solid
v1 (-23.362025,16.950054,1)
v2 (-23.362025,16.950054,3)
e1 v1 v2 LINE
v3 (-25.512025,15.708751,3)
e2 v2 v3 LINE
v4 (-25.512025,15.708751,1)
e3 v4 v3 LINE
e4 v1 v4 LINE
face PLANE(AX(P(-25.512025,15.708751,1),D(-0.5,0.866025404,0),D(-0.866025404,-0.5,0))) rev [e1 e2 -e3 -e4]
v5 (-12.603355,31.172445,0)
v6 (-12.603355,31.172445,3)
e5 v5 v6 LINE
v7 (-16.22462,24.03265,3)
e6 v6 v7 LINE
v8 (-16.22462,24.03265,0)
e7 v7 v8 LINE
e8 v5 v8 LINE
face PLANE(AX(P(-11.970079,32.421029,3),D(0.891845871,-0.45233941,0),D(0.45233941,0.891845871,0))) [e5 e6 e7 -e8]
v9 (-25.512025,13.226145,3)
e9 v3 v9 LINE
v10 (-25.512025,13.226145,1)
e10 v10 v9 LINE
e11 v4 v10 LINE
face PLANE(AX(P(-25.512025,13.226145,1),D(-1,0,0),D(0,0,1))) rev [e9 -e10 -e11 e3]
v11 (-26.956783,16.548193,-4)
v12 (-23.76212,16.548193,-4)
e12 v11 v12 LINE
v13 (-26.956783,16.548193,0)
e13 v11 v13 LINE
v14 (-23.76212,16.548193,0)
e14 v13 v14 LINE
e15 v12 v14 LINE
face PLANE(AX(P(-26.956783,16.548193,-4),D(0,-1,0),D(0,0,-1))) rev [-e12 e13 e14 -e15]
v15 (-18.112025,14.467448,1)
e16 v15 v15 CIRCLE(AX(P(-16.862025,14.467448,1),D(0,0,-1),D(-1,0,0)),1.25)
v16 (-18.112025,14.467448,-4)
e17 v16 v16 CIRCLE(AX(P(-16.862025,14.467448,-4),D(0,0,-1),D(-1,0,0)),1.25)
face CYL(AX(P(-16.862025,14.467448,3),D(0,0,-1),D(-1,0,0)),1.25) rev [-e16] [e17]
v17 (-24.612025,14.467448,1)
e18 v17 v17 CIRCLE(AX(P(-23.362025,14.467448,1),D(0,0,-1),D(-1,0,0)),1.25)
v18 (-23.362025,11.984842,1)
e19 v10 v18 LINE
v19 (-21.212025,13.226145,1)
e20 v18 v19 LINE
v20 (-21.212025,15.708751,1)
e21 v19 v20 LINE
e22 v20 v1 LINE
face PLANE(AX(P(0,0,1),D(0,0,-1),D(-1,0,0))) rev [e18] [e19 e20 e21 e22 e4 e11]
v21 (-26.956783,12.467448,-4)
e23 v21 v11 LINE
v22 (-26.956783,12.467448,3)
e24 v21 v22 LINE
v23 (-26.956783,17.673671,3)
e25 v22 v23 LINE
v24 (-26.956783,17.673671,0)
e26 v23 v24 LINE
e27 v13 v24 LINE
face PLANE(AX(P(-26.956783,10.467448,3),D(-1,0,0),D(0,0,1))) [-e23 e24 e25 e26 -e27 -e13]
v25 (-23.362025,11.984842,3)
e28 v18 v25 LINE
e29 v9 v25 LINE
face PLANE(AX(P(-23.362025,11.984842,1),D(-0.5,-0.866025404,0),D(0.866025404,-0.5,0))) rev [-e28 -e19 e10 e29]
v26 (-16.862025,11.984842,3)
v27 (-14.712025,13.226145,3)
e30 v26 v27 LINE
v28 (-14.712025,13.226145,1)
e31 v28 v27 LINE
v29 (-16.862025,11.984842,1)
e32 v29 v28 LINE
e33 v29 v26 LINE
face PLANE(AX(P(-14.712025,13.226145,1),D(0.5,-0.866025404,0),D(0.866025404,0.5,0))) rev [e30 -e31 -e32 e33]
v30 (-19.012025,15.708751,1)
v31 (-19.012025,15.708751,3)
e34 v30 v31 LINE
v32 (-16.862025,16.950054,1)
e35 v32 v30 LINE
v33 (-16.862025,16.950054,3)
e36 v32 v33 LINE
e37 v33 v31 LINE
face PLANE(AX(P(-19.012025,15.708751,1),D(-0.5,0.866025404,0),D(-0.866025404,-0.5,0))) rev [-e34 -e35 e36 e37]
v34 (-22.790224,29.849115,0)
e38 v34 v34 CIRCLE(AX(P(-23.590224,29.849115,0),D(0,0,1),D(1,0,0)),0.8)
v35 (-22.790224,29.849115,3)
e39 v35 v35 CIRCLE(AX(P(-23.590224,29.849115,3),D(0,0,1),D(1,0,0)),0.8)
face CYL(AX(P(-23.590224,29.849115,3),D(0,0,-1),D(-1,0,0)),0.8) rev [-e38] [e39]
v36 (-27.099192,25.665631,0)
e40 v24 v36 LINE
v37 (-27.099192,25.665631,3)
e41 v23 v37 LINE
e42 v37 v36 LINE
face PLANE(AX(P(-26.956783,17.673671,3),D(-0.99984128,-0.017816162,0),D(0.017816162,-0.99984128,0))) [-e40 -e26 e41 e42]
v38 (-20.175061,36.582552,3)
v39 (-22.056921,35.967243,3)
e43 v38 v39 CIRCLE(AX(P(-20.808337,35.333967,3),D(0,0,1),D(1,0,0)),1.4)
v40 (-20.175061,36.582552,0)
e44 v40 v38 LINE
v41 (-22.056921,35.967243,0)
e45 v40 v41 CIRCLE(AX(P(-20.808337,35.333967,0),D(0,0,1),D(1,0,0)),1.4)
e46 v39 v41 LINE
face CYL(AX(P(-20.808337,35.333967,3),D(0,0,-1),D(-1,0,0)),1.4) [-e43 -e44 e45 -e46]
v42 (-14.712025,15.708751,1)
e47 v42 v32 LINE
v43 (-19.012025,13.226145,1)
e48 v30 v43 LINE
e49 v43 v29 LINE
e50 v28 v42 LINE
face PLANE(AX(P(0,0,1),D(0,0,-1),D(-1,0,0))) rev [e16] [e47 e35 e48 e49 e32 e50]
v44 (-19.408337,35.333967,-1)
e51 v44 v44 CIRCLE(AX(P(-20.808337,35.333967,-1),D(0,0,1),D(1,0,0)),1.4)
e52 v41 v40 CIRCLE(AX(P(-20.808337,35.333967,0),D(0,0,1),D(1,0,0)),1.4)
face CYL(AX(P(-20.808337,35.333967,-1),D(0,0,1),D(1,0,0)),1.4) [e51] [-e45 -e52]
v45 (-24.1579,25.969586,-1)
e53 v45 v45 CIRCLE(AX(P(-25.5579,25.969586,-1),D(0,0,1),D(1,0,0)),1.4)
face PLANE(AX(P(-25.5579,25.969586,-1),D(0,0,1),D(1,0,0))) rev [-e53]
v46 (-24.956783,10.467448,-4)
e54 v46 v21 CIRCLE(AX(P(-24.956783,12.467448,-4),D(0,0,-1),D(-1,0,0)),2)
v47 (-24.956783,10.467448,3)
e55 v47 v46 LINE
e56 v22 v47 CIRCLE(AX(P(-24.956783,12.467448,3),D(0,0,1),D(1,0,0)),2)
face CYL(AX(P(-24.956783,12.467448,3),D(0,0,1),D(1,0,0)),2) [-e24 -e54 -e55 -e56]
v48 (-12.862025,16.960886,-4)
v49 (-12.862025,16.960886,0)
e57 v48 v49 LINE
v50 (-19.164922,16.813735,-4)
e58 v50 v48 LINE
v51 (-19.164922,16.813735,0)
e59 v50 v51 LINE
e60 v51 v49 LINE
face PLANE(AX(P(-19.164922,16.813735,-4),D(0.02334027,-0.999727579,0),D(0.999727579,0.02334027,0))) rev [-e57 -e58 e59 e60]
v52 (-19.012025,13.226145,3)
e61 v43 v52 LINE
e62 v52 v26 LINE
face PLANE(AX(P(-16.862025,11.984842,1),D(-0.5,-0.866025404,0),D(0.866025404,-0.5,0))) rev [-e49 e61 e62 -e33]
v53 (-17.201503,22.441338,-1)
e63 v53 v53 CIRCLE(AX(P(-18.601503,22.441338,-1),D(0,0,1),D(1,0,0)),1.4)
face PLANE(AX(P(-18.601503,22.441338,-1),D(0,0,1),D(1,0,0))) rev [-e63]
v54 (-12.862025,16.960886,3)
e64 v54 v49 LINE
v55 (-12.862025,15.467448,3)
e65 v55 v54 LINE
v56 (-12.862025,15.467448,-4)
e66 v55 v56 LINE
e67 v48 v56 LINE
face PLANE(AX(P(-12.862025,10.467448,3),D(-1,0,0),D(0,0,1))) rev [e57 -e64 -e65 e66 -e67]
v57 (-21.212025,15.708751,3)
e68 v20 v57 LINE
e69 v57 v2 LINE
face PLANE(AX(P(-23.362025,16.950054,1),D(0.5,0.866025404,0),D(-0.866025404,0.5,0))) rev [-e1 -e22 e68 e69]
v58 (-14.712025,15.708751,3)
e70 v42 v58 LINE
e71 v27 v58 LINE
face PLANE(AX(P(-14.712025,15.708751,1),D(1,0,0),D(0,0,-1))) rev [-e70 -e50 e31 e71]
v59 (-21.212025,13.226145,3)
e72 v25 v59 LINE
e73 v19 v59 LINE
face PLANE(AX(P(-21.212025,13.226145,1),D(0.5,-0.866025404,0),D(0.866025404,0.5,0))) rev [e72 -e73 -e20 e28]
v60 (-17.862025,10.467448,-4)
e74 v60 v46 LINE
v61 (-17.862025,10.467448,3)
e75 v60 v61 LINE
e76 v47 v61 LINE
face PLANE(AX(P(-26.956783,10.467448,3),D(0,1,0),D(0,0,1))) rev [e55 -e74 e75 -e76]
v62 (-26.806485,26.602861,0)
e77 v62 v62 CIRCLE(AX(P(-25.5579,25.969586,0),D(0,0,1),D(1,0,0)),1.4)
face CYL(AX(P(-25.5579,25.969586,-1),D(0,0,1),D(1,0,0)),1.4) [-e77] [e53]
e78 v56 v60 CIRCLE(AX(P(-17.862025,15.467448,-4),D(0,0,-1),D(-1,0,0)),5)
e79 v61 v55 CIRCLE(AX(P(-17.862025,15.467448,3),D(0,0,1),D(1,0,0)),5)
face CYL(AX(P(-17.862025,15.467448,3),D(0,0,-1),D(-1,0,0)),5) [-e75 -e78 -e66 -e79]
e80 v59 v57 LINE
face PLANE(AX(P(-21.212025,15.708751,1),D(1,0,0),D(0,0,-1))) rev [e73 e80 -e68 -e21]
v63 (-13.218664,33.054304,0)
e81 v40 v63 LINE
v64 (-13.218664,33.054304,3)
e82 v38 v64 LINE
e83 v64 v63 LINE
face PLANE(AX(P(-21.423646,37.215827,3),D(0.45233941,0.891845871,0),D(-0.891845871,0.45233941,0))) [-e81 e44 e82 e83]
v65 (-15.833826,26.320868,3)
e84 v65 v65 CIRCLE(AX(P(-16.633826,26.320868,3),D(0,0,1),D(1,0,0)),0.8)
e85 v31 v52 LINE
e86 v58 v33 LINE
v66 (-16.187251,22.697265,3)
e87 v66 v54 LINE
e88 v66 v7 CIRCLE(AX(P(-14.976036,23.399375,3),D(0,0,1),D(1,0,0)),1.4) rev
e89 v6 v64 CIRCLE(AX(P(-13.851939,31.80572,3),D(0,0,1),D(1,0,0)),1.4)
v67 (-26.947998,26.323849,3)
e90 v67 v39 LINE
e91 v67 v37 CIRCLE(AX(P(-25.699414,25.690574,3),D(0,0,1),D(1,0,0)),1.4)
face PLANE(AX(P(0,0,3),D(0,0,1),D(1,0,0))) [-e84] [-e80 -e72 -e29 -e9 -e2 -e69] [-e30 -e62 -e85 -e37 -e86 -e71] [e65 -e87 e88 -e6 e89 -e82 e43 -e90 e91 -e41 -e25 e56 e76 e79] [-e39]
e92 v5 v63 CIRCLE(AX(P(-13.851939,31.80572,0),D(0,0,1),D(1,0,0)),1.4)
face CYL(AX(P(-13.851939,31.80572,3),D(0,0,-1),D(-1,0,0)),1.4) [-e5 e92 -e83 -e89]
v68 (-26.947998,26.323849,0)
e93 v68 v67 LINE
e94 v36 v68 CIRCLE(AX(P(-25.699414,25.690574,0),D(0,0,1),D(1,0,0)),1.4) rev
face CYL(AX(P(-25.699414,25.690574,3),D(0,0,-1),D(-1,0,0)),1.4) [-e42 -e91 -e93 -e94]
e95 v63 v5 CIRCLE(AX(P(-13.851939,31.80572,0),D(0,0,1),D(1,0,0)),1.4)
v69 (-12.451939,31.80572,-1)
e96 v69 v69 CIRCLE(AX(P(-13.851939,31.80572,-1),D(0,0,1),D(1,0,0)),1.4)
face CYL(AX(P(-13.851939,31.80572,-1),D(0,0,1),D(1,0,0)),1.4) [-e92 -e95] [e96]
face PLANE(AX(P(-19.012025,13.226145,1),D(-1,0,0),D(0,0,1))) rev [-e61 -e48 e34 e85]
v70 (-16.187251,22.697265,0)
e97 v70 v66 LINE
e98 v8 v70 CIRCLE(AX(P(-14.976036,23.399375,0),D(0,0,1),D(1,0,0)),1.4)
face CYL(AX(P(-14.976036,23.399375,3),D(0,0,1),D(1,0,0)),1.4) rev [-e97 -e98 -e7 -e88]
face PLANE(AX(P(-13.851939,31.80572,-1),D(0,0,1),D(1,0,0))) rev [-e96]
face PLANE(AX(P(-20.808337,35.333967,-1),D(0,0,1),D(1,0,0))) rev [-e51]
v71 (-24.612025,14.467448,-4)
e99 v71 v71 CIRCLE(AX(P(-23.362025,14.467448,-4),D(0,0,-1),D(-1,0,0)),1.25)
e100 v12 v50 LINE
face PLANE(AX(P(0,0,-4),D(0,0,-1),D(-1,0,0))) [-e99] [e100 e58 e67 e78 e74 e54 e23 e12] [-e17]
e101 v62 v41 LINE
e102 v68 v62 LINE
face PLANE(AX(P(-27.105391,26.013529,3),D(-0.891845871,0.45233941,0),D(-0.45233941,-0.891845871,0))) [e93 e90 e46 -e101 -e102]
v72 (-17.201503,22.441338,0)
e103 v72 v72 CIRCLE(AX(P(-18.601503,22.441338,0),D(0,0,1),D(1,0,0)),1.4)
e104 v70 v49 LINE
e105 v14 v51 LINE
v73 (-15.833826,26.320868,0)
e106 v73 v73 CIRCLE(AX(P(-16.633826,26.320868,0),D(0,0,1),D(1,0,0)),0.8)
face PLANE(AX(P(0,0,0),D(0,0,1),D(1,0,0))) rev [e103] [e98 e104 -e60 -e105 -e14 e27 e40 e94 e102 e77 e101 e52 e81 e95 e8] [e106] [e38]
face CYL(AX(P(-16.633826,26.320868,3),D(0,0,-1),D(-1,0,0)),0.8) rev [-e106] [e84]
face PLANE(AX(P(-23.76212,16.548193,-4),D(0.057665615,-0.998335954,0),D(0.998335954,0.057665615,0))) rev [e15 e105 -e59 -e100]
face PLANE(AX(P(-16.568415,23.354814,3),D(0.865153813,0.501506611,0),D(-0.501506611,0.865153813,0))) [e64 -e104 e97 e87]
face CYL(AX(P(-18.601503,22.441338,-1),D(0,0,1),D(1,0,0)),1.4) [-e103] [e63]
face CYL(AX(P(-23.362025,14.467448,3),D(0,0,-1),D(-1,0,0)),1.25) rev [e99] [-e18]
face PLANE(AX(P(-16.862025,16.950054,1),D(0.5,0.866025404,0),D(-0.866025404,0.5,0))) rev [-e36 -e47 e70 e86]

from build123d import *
from build123d.topology import SkipClean

# Parameters (mm, degrees)
SKETCH_1_R          = 1.25
SKETCH_1_R_2        = 0.8
EXTRUDE_1_DEPTH     = 3
SKETCH_1_3_R        = 1.4
EXTRUDE_2_DEPTH     = 1
EXTRUDE_START       = 4
SKETCH_2_R          = 1.25
EXTRUDE_4_DEPTH     = 4
CUT_EXTRUDE_1_DEPTH = 2
FILLET_5_R          = 1.4
FILLET_6_R          = 5
FILLET_7_R          = 2


with BuildPart() as part:
    # 草图1 → 凸台-拉伸1 (new body)
    with BuildSketch(Plane.XY):
        Polygon((-26.956782862, 10.467447756), (-12.862024989, 10.467447756), (-12.862024989, 16.960886275), (-16.568414577, 23.35481412), (-11.970079327, 32.421029044), (-21.423645563, 37.215826788), (-27.105390709, 26.013528601), (-26.956782862, 17.673670772), align=None)
        with Locations((-16.862024989, 14.467447756)):
            Circle(SKETCH_1_R, mode=Mode.SUBTRACT)
        with Locations((-23.362024989, 14.467447756)):
            Circle(SKETCH_1_R, mode=Mode.SUBTRACT)
        with Locations((-16.633826091, 26.320867889)):
            Circle(SKETCH_1_R_2, mode=Mode.SUBTRACT)
        with Locations((-23.590223888, 29.849115285)):
            Circle(SKETCH_1_R_2, mode=Mode.SUBTRACT)
    extrude(amount=EXTRUDE_1_DEPTH)

    # 草图1<3> → 凸台-拉伸2 (add)
    with BuildSketch(Plane.XY):
        with Locations((-13.85193872, 31.805719998)):
            Circle(SKETCH_1_3_R)
        with Locations((-20.808336517, 35.333967395)):
            Circle(SKETCH_1_3_R)
        with Locations((-25.55790032, 25.969585745)):
            Circle(SKETCH_1_3_R)
        with Locations((-18.601502523, 22.441338348)):
            Circle(SKETCH_1_3_R)
    extrude(amount=-EXTRUDE_2_DEPTH)

    # 草图2 → 凸台-拉伸4 (add)
    with SkipClean():  # the faces are left unmerged after this step: merging them gives an invalid solid
        with BuildSketch(Plane(origin=(0, 0, 0), x_dir=(-1, 0, 0), z_dir=(0, 0, -1)).offset(EXTRUDE_START)):
            Polygon((12.862024989, 16.960886275), (12.862024989, 10.467447756), (26.956782862, 10.467447756), (26.956782862, 16.548192736), (23.76212017, 16.548192736), (19.164921884, 16.813734876), align=None)
            with Locations((16.862024989, 14.467447756)):
                Circle(SKETCH_2_R, mode=Mode.SUBTRACT)
            with Locations((23.362024989, 14.467447756)):
                Circle(SKETCH_2_R, mode=Mode.SUBTRACT)
        extrude(amount=-EXTRUDE_4_DEPTH)

    # 草图3 → 切除-拉伸1 (cut)
    with BuildSketch(Plane.XY.offset(3)):
        Polygon((-23.362024989, 16.950053913), (-21.212024989, 15.708750835), (-21.212024989, 13.226144677), (-23.362024989, 11.984841598), (-25.512024989, 13.226144677), (-25.512024989, 15.708750835), align=None)
        Polygon((-16.862024989, 16.950053913), (-14.712024989, 15.708750835), (-14.712024989, 13.226144677), (-16.862024989, 11.984841598), (-19.012024989, 13.226144677), (-19.012024989, 15.708750835), align=None)
    extrude(amount=-CUT_EXTRUDE_1_DEPTH, mode=Mode.SUBTRACT)

    # 圆角5
    fillet_5_edges = [part.edges().sort_by_distance(p)[0] for p in [
        (-27.105390709, 26.013528601, 1.5),
        (-16.568414577, 23.35481412, 1.5),
        (-11.970079327, 32.421029044, 1.5),
        (-21.423645563, 37.215826788, 1.5),
    ]]
    fillet(fillet_5_edges, radius=FILLET_5_R - 0.0001)  # a hair under: the kernel refuses the full size

    # 圆角6
    fillet_6_edges = [part.edges().sort_by_distance(p)[0] for p in [
        (-12.862024989, 10.467447756, -0.5),
    ]]
    fillet(fillet_6_edges, radius=FILLET_6_R)

    # 圆角7
    fillet_7_edges = [part.edges().sort_by_distance(p)[0] for p in [
        (-26.956782862, 10.467447756, -0.5),
    ]]
    fillet(fillet_7_edges, radius=FILLET_7_R)


solid = part.part
